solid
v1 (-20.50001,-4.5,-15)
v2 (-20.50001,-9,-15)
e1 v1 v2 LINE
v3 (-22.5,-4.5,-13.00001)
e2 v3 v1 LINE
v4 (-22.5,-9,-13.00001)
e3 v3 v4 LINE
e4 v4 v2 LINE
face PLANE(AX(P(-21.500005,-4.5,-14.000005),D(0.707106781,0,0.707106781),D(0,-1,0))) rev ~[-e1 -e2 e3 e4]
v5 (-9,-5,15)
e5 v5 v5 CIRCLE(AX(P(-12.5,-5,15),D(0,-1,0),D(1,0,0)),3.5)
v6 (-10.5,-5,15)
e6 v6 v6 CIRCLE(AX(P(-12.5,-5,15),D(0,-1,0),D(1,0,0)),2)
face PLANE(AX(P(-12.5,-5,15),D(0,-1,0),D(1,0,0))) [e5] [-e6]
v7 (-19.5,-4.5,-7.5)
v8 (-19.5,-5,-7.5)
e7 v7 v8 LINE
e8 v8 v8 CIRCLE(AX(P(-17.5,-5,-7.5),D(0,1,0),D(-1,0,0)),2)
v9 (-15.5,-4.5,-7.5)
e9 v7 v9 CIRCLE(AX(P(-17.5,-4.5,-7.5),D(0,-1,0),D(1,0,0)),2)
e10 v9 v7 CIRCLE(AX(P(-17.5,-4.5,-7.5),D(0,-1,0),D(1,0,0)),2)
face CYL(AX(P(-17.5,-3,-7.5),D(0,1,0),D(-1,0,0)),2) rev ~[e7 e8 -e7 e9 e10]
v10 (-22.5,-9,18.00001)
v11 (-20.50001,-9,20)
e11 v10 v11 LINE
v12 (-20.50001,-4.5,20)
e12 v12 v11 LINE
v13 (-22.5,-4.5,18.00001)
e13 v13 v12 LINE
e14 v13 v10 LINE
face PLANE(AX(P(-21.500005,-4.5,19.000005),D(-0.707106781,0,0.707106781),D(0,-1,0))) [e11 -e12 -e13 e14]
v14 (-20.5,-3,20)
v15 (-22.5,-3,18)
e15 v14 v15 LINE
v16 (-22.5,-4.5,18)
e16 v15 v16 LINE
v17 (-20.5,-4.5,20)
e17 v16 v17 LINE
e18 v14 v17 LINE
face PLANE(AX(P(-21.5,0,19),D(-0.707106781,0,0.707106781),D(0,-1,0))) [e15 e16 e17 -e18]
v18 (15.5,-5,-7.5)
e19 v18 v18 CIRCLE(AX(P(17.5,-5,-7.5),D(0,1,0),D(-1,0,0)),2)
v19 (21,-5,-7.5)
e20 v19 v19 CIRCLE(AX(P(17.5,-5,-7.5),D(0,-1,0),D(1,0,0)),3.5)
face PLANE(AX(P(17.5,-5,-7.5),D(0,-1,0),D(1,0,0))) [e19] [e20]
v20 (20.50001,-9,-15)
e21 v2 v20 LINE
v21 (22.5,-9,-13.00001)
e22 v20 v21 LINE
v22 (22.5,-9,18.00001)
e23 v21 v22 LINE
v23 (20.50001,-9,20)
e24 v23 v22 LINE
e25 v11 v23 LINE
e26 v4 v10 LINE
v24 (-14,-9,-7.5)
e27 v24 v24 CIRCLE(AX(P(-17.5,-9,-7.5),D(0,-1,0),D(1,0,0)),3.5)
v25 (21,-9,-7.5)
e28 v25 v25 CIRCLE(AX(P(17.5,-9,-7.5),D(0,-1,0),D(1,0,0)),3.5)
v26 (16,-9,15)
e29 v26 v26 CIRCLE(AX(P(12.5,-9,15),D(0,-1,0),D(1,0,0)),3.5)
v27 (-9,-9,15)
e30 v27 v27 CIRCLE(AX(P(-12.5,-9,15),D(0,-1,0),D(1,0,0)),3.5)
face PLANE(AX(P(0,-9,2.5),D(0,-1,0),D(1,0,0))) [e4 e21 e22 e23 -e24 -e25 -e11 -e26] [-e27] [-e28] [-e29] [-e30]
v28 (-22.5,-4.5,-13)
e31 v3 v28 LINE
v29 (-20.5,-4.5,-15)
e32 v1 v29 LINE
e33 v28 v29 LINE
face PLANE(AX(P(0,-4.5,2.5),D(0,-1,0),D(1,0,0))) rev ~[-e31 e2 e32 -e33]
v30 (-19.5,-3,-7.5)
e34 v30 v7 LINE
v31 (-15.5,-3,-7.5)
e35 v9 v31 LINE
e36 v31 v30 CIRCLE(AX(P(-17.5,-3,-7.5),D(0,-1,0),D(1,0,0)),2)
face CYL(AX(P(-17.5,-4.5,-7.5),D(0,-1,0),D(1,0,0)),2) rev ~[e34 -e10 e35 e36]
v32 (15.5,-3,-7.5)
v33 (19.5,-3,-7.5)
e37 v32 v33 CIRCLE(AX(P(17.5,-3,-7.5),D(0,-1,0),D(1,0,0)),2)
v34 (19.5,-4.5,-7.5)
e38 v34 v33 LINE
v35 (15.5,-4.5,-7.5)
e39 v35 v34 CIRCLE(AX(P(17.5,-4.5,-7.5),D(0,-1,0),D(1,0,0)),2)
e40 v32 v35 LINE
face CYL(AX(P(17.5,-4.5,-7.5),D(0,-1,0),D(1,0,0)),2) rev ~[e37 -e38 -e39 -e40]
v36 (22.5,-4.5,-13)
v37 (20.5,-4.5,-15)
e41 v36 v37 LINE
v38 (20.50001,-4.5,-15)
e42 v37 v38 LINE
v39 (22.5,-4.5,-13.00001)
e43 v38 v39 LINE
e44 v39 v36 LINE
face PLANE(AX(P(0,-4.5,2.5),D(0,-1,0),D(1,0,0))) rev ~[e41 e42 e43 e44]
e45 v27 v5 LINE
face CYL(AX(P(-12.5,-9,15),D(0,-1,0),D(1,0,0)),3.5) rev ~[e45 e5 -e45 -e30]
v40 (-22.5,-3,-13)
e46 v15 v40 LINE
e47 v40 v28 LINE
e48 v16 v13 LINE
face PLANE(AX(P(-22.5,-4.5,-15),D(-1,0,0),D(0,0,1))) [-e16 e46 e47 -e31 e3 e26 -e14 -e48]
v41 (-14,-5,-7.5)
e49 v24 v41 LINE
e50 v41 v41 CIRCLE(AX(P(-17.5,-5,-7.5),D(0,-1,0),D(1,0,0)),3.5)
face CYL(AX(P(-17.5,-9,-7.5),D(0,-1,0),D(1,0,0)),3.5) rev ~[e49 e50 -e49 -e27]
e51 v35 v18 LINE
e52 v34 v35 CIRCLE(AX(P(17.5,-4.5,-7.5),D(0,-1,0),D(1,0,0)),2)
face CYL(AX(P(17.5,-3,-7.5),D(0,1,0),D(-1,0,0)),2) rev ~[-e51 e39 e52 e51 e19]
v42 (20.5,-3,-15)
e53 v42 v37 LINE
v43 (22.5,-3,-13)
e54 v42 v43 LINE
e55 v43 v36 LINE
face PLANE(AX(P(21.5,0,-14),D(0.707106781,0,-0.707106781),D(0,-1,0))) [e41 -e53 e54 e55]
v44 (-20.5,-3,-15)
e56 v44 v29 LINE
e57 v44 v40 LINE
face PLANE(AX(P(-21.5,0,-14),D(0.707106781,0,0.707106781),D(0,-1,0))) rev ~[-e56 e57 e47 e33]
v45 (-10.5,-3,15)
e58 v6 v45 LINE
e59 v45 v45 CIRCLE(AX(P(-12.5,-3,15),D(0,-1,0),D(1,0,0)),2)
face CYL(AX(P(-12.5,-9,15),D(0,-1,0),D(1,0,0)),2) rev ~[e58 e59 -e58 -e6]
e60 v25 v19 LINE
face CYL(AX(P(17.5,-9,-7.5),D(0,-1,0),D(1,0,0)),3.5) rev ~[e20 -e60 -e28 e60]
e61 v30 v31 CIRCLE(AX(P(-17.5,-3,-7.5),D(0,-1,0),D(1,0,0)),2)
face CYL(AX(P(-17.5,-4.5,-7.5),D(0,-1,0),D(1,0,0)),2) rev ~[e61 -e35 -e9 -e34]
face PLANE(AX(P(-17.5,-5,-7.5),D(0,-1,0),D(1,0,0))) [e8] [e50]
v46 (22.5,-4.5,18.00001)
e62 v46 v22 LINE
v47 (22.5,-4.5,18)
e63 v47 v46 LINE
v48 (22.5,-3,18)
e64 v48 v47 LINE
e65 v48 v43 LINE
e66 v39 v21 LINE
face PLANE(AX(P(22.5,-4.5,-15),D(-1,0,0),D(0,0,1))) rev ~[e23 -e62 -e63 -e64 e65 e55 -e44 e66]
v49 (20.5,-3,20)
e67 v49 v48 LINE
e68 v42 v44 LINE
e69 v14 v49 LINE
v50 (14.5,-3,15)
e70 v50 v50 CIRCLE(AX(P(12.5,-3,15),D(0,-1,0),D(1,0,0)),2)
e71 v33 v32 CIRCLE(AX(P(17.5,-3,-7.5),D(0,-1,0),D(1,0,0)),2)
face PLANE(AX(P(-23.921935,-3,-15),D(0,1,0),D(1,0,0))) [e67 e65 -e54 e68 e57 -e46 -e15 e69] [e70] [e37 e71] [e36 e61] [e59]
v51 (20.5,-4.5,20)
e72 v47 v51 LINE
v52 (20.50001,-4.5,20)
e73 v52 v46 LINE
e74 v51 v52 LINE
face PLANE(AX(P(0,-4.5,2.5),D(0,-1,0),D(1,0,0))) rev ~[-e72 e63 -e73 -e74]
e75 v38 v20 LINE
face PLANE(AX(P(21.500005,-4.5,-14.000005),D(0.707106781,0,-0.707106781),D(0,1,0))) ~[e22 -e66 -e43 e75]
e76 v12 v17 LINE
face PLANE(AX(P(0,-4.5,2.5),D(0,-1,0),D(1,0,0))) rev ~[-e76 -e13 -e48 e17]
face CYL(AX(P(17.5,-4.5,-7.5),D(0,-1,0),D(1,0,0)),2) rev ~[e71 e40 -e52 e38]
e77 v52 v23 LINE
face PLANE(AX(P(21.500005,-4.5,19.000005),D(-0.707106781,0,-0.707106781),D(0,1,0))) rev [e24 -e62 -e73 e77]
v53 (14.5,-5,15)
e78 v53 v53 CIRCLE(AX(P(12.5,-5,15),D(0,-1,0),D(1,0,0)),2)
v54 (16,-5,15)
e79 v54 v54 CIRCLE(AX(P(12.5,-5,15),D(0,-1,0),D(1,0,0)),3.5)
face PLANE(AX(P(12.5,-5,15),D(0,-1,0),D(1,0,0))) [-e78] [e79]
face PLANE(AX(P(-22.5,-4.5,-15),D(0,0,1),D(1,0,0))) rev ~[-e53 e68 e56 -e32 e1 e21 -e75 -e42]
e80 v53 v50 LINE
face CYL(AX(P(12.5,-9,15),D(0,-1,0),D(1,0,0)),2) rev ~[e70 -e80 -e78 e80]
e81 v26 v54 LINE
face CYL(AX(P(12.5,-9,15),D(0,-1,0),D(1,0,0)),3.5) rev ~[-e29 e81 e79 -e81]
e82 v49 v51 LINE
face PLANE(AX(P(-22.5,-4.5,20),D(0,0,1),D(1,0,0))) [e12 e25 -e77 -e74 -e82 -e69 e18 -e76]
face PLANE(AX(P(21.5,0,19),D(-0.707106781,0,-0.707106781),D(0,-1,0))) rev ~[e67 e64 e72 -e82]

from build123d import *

# Parameters (mm, degrees)
F0_W      = 45
F0_H      = 35
F1_DEPTH  = 4.5
F2_W      = 15
F2_H      = 1.5
F3_DEPTH  = 35.001
F4_R      = 1.75
F5_DEPTH  = 3.5
F6_R      = 2
F7_DEPTH  = 4.501
F8_W      = 10
F8_H      = 10
F9_DEPTH  = 3
F10_SIZE  = 2
F11_W     = 48.3506806195
F11_H     = 3
F12_DEPTH = 35.001
F13_W     = 45
F13_H     = 35
F14_DEPTH = 4.5
F15_SIZE  = 1.99999
F16_R     = 2
F17_DEPTH = 6.001
F18_R     = 3.5
F19_DEPTH = 4
F20_R     = 3.5
F21_DEPTH = 4
F22_R     = 2
F23_DEPTH = 6.001


# Not quite as in the source:
# - a fillet or chamfer is up to 0.001 mm smaller than in the source, because OpenCascade refuses the exact size


with BuildPart() as f1:
    # F0 (on Front) → F1 (new body)
    with BuildSketch(Plane.XZ):
        with Locations((0, 2.5)):
            Rectangle(F0_W, F0_H)
    extrude(amount=F1_DEPTH)

    # F2 (on face) → F3 (cut, through all)
    with BuildSketch(Plane.XY.offset(20)):
        with Locations((-2.5, -2.25)):
            Rectangle(F2_W, F2_H)
    extrude(amount=-F3_DEPTH, mode=Mode.SUBTRACT)

    # F4 (on face) → F5 (cut)
    with BuildSketch(Plane.XZ.offset(4.5)):
        with Locations((17.5, -7.5)):
            Circle(F4_R)
        with Locations((-17.5, -7.5)):
            Circle(F4_R)
    extrude(amount=-F5_DEPTH, mode=Mode.SUBTRACT)

    # F6 (on face) → F7 (cut, through all)
    with BuildSketch(Plane.XZ.offset(4.5)):
        with Locations((17.5, -7.5)):
            Circle(F6_R)
        with Locations((-17.5, -7.5)):
            Circle(F6_R)
    extrude(amount=-F7_DEPTH, mode=Mode.SUBTRACT)

    # F8 (on face) → F9 (cut)
    with BuildSketch(Plane(origin=(0, 0, 0), x_dir=(-1, 0, 0), z_dir=(0, 1, 0))):
        with Locations((5, 10)):
            Rectangle(F8_W, F8_H)
    extrude(amount=-F9_DEPTH, mode=Mode.SUBTRACT)

    # F10
    f10_edges = [f1.edges().sort_by_distance(p)[0] for p in [
        (-22.5, -2.25, 20),
        (22.5, -2.25, 20),
        (22.5, -2.25, -15),
        (-22.5, -2.25, -15),
    ]]
    chamfer(f10_edges, length=F10_SIZE)

    # F11 (on face) → F12 (cut, through all)
    with BuildSketch(Plane(origin=(0, 0, -15), x_dir=(1, 0, 0), z_dir=(0, 0, -1))):
        with Locations((0.253405422, 1.5)):
            Rectangle(F11_W, F11_H)
    extrude(amount=-F12_DEPTH, mode=Mode.SUBTRACT)

    # F13 (on face) → F14 (join)
    with BuildSketch(Plane.XZ.offset(4.5)):
        with Locations((0, 2.5)):
            Rectangle(F13_W, F13_H)
    extrude(amount=F14_DEPTH)

    # F15 (size 2 in the source; OpenCascade refuses exactly that, so slightly less here)
    f15_edges = [f1.edges().sort_by_distance(p)[0] for p in [
        (-22.5, -6.75, -15),
        (22.5, -6.75, -15),
        (22.5, -6.75, 20),
        (-22.5, -6.75, 20),
    ]]
    chamfer(f15_edges, length=F15_SIZE)

    # F16 (on face) → F17 (cut, through all)
    with BuildSketch(Plane(origin=(0, -3, 0), x_dir=(-1, 0, 0), z_dir=(0, 1, 0))):
        with Locations((17.5, -7.5)):
            Circle(F16_R)
        with Locations((-17.5, -7.5)):
            Circle(F16_R)
    extrude(amount=-F17_DEPTH, mode=Mode.SUBTRACT)

    # F18 (on face) → F19 (cut)
    with BuildSketch(Plane.XZ.offset(9)):
        with Locations((-17.5, -7.5)):
            Circle(F18_R)
        with Locations((17.5, -7.5)):
            Circle(F18_R)
    extrude(amount=-F19_DEPTH, mode=Mode.SUBTRACT)

    # F20 (on face) → F21 (cut)
    with BuildSketch(Plane.XZ.offset(9)):
        with Locations((-12.5, 15)):
            Circle(F20_R)
        with Locations((12.5, 15)):
            Circle(F20_R)
    extrude(amount=-F21_DEPTH, mode=Mode.SUBTRACT)

    # F22 (on face) → F23 (cut, through all)
    with BuildSketch(Plane.XZ.offset(9)):
        with Locations((-12.5, 15)):
            Circle(F22_R)
        with Locations((12.5, 15)):
            Circle(F22_R)
    extrude(amount=-F23_DEPTH, mode=Mode.SUBTRACT)


solid = f1.part
